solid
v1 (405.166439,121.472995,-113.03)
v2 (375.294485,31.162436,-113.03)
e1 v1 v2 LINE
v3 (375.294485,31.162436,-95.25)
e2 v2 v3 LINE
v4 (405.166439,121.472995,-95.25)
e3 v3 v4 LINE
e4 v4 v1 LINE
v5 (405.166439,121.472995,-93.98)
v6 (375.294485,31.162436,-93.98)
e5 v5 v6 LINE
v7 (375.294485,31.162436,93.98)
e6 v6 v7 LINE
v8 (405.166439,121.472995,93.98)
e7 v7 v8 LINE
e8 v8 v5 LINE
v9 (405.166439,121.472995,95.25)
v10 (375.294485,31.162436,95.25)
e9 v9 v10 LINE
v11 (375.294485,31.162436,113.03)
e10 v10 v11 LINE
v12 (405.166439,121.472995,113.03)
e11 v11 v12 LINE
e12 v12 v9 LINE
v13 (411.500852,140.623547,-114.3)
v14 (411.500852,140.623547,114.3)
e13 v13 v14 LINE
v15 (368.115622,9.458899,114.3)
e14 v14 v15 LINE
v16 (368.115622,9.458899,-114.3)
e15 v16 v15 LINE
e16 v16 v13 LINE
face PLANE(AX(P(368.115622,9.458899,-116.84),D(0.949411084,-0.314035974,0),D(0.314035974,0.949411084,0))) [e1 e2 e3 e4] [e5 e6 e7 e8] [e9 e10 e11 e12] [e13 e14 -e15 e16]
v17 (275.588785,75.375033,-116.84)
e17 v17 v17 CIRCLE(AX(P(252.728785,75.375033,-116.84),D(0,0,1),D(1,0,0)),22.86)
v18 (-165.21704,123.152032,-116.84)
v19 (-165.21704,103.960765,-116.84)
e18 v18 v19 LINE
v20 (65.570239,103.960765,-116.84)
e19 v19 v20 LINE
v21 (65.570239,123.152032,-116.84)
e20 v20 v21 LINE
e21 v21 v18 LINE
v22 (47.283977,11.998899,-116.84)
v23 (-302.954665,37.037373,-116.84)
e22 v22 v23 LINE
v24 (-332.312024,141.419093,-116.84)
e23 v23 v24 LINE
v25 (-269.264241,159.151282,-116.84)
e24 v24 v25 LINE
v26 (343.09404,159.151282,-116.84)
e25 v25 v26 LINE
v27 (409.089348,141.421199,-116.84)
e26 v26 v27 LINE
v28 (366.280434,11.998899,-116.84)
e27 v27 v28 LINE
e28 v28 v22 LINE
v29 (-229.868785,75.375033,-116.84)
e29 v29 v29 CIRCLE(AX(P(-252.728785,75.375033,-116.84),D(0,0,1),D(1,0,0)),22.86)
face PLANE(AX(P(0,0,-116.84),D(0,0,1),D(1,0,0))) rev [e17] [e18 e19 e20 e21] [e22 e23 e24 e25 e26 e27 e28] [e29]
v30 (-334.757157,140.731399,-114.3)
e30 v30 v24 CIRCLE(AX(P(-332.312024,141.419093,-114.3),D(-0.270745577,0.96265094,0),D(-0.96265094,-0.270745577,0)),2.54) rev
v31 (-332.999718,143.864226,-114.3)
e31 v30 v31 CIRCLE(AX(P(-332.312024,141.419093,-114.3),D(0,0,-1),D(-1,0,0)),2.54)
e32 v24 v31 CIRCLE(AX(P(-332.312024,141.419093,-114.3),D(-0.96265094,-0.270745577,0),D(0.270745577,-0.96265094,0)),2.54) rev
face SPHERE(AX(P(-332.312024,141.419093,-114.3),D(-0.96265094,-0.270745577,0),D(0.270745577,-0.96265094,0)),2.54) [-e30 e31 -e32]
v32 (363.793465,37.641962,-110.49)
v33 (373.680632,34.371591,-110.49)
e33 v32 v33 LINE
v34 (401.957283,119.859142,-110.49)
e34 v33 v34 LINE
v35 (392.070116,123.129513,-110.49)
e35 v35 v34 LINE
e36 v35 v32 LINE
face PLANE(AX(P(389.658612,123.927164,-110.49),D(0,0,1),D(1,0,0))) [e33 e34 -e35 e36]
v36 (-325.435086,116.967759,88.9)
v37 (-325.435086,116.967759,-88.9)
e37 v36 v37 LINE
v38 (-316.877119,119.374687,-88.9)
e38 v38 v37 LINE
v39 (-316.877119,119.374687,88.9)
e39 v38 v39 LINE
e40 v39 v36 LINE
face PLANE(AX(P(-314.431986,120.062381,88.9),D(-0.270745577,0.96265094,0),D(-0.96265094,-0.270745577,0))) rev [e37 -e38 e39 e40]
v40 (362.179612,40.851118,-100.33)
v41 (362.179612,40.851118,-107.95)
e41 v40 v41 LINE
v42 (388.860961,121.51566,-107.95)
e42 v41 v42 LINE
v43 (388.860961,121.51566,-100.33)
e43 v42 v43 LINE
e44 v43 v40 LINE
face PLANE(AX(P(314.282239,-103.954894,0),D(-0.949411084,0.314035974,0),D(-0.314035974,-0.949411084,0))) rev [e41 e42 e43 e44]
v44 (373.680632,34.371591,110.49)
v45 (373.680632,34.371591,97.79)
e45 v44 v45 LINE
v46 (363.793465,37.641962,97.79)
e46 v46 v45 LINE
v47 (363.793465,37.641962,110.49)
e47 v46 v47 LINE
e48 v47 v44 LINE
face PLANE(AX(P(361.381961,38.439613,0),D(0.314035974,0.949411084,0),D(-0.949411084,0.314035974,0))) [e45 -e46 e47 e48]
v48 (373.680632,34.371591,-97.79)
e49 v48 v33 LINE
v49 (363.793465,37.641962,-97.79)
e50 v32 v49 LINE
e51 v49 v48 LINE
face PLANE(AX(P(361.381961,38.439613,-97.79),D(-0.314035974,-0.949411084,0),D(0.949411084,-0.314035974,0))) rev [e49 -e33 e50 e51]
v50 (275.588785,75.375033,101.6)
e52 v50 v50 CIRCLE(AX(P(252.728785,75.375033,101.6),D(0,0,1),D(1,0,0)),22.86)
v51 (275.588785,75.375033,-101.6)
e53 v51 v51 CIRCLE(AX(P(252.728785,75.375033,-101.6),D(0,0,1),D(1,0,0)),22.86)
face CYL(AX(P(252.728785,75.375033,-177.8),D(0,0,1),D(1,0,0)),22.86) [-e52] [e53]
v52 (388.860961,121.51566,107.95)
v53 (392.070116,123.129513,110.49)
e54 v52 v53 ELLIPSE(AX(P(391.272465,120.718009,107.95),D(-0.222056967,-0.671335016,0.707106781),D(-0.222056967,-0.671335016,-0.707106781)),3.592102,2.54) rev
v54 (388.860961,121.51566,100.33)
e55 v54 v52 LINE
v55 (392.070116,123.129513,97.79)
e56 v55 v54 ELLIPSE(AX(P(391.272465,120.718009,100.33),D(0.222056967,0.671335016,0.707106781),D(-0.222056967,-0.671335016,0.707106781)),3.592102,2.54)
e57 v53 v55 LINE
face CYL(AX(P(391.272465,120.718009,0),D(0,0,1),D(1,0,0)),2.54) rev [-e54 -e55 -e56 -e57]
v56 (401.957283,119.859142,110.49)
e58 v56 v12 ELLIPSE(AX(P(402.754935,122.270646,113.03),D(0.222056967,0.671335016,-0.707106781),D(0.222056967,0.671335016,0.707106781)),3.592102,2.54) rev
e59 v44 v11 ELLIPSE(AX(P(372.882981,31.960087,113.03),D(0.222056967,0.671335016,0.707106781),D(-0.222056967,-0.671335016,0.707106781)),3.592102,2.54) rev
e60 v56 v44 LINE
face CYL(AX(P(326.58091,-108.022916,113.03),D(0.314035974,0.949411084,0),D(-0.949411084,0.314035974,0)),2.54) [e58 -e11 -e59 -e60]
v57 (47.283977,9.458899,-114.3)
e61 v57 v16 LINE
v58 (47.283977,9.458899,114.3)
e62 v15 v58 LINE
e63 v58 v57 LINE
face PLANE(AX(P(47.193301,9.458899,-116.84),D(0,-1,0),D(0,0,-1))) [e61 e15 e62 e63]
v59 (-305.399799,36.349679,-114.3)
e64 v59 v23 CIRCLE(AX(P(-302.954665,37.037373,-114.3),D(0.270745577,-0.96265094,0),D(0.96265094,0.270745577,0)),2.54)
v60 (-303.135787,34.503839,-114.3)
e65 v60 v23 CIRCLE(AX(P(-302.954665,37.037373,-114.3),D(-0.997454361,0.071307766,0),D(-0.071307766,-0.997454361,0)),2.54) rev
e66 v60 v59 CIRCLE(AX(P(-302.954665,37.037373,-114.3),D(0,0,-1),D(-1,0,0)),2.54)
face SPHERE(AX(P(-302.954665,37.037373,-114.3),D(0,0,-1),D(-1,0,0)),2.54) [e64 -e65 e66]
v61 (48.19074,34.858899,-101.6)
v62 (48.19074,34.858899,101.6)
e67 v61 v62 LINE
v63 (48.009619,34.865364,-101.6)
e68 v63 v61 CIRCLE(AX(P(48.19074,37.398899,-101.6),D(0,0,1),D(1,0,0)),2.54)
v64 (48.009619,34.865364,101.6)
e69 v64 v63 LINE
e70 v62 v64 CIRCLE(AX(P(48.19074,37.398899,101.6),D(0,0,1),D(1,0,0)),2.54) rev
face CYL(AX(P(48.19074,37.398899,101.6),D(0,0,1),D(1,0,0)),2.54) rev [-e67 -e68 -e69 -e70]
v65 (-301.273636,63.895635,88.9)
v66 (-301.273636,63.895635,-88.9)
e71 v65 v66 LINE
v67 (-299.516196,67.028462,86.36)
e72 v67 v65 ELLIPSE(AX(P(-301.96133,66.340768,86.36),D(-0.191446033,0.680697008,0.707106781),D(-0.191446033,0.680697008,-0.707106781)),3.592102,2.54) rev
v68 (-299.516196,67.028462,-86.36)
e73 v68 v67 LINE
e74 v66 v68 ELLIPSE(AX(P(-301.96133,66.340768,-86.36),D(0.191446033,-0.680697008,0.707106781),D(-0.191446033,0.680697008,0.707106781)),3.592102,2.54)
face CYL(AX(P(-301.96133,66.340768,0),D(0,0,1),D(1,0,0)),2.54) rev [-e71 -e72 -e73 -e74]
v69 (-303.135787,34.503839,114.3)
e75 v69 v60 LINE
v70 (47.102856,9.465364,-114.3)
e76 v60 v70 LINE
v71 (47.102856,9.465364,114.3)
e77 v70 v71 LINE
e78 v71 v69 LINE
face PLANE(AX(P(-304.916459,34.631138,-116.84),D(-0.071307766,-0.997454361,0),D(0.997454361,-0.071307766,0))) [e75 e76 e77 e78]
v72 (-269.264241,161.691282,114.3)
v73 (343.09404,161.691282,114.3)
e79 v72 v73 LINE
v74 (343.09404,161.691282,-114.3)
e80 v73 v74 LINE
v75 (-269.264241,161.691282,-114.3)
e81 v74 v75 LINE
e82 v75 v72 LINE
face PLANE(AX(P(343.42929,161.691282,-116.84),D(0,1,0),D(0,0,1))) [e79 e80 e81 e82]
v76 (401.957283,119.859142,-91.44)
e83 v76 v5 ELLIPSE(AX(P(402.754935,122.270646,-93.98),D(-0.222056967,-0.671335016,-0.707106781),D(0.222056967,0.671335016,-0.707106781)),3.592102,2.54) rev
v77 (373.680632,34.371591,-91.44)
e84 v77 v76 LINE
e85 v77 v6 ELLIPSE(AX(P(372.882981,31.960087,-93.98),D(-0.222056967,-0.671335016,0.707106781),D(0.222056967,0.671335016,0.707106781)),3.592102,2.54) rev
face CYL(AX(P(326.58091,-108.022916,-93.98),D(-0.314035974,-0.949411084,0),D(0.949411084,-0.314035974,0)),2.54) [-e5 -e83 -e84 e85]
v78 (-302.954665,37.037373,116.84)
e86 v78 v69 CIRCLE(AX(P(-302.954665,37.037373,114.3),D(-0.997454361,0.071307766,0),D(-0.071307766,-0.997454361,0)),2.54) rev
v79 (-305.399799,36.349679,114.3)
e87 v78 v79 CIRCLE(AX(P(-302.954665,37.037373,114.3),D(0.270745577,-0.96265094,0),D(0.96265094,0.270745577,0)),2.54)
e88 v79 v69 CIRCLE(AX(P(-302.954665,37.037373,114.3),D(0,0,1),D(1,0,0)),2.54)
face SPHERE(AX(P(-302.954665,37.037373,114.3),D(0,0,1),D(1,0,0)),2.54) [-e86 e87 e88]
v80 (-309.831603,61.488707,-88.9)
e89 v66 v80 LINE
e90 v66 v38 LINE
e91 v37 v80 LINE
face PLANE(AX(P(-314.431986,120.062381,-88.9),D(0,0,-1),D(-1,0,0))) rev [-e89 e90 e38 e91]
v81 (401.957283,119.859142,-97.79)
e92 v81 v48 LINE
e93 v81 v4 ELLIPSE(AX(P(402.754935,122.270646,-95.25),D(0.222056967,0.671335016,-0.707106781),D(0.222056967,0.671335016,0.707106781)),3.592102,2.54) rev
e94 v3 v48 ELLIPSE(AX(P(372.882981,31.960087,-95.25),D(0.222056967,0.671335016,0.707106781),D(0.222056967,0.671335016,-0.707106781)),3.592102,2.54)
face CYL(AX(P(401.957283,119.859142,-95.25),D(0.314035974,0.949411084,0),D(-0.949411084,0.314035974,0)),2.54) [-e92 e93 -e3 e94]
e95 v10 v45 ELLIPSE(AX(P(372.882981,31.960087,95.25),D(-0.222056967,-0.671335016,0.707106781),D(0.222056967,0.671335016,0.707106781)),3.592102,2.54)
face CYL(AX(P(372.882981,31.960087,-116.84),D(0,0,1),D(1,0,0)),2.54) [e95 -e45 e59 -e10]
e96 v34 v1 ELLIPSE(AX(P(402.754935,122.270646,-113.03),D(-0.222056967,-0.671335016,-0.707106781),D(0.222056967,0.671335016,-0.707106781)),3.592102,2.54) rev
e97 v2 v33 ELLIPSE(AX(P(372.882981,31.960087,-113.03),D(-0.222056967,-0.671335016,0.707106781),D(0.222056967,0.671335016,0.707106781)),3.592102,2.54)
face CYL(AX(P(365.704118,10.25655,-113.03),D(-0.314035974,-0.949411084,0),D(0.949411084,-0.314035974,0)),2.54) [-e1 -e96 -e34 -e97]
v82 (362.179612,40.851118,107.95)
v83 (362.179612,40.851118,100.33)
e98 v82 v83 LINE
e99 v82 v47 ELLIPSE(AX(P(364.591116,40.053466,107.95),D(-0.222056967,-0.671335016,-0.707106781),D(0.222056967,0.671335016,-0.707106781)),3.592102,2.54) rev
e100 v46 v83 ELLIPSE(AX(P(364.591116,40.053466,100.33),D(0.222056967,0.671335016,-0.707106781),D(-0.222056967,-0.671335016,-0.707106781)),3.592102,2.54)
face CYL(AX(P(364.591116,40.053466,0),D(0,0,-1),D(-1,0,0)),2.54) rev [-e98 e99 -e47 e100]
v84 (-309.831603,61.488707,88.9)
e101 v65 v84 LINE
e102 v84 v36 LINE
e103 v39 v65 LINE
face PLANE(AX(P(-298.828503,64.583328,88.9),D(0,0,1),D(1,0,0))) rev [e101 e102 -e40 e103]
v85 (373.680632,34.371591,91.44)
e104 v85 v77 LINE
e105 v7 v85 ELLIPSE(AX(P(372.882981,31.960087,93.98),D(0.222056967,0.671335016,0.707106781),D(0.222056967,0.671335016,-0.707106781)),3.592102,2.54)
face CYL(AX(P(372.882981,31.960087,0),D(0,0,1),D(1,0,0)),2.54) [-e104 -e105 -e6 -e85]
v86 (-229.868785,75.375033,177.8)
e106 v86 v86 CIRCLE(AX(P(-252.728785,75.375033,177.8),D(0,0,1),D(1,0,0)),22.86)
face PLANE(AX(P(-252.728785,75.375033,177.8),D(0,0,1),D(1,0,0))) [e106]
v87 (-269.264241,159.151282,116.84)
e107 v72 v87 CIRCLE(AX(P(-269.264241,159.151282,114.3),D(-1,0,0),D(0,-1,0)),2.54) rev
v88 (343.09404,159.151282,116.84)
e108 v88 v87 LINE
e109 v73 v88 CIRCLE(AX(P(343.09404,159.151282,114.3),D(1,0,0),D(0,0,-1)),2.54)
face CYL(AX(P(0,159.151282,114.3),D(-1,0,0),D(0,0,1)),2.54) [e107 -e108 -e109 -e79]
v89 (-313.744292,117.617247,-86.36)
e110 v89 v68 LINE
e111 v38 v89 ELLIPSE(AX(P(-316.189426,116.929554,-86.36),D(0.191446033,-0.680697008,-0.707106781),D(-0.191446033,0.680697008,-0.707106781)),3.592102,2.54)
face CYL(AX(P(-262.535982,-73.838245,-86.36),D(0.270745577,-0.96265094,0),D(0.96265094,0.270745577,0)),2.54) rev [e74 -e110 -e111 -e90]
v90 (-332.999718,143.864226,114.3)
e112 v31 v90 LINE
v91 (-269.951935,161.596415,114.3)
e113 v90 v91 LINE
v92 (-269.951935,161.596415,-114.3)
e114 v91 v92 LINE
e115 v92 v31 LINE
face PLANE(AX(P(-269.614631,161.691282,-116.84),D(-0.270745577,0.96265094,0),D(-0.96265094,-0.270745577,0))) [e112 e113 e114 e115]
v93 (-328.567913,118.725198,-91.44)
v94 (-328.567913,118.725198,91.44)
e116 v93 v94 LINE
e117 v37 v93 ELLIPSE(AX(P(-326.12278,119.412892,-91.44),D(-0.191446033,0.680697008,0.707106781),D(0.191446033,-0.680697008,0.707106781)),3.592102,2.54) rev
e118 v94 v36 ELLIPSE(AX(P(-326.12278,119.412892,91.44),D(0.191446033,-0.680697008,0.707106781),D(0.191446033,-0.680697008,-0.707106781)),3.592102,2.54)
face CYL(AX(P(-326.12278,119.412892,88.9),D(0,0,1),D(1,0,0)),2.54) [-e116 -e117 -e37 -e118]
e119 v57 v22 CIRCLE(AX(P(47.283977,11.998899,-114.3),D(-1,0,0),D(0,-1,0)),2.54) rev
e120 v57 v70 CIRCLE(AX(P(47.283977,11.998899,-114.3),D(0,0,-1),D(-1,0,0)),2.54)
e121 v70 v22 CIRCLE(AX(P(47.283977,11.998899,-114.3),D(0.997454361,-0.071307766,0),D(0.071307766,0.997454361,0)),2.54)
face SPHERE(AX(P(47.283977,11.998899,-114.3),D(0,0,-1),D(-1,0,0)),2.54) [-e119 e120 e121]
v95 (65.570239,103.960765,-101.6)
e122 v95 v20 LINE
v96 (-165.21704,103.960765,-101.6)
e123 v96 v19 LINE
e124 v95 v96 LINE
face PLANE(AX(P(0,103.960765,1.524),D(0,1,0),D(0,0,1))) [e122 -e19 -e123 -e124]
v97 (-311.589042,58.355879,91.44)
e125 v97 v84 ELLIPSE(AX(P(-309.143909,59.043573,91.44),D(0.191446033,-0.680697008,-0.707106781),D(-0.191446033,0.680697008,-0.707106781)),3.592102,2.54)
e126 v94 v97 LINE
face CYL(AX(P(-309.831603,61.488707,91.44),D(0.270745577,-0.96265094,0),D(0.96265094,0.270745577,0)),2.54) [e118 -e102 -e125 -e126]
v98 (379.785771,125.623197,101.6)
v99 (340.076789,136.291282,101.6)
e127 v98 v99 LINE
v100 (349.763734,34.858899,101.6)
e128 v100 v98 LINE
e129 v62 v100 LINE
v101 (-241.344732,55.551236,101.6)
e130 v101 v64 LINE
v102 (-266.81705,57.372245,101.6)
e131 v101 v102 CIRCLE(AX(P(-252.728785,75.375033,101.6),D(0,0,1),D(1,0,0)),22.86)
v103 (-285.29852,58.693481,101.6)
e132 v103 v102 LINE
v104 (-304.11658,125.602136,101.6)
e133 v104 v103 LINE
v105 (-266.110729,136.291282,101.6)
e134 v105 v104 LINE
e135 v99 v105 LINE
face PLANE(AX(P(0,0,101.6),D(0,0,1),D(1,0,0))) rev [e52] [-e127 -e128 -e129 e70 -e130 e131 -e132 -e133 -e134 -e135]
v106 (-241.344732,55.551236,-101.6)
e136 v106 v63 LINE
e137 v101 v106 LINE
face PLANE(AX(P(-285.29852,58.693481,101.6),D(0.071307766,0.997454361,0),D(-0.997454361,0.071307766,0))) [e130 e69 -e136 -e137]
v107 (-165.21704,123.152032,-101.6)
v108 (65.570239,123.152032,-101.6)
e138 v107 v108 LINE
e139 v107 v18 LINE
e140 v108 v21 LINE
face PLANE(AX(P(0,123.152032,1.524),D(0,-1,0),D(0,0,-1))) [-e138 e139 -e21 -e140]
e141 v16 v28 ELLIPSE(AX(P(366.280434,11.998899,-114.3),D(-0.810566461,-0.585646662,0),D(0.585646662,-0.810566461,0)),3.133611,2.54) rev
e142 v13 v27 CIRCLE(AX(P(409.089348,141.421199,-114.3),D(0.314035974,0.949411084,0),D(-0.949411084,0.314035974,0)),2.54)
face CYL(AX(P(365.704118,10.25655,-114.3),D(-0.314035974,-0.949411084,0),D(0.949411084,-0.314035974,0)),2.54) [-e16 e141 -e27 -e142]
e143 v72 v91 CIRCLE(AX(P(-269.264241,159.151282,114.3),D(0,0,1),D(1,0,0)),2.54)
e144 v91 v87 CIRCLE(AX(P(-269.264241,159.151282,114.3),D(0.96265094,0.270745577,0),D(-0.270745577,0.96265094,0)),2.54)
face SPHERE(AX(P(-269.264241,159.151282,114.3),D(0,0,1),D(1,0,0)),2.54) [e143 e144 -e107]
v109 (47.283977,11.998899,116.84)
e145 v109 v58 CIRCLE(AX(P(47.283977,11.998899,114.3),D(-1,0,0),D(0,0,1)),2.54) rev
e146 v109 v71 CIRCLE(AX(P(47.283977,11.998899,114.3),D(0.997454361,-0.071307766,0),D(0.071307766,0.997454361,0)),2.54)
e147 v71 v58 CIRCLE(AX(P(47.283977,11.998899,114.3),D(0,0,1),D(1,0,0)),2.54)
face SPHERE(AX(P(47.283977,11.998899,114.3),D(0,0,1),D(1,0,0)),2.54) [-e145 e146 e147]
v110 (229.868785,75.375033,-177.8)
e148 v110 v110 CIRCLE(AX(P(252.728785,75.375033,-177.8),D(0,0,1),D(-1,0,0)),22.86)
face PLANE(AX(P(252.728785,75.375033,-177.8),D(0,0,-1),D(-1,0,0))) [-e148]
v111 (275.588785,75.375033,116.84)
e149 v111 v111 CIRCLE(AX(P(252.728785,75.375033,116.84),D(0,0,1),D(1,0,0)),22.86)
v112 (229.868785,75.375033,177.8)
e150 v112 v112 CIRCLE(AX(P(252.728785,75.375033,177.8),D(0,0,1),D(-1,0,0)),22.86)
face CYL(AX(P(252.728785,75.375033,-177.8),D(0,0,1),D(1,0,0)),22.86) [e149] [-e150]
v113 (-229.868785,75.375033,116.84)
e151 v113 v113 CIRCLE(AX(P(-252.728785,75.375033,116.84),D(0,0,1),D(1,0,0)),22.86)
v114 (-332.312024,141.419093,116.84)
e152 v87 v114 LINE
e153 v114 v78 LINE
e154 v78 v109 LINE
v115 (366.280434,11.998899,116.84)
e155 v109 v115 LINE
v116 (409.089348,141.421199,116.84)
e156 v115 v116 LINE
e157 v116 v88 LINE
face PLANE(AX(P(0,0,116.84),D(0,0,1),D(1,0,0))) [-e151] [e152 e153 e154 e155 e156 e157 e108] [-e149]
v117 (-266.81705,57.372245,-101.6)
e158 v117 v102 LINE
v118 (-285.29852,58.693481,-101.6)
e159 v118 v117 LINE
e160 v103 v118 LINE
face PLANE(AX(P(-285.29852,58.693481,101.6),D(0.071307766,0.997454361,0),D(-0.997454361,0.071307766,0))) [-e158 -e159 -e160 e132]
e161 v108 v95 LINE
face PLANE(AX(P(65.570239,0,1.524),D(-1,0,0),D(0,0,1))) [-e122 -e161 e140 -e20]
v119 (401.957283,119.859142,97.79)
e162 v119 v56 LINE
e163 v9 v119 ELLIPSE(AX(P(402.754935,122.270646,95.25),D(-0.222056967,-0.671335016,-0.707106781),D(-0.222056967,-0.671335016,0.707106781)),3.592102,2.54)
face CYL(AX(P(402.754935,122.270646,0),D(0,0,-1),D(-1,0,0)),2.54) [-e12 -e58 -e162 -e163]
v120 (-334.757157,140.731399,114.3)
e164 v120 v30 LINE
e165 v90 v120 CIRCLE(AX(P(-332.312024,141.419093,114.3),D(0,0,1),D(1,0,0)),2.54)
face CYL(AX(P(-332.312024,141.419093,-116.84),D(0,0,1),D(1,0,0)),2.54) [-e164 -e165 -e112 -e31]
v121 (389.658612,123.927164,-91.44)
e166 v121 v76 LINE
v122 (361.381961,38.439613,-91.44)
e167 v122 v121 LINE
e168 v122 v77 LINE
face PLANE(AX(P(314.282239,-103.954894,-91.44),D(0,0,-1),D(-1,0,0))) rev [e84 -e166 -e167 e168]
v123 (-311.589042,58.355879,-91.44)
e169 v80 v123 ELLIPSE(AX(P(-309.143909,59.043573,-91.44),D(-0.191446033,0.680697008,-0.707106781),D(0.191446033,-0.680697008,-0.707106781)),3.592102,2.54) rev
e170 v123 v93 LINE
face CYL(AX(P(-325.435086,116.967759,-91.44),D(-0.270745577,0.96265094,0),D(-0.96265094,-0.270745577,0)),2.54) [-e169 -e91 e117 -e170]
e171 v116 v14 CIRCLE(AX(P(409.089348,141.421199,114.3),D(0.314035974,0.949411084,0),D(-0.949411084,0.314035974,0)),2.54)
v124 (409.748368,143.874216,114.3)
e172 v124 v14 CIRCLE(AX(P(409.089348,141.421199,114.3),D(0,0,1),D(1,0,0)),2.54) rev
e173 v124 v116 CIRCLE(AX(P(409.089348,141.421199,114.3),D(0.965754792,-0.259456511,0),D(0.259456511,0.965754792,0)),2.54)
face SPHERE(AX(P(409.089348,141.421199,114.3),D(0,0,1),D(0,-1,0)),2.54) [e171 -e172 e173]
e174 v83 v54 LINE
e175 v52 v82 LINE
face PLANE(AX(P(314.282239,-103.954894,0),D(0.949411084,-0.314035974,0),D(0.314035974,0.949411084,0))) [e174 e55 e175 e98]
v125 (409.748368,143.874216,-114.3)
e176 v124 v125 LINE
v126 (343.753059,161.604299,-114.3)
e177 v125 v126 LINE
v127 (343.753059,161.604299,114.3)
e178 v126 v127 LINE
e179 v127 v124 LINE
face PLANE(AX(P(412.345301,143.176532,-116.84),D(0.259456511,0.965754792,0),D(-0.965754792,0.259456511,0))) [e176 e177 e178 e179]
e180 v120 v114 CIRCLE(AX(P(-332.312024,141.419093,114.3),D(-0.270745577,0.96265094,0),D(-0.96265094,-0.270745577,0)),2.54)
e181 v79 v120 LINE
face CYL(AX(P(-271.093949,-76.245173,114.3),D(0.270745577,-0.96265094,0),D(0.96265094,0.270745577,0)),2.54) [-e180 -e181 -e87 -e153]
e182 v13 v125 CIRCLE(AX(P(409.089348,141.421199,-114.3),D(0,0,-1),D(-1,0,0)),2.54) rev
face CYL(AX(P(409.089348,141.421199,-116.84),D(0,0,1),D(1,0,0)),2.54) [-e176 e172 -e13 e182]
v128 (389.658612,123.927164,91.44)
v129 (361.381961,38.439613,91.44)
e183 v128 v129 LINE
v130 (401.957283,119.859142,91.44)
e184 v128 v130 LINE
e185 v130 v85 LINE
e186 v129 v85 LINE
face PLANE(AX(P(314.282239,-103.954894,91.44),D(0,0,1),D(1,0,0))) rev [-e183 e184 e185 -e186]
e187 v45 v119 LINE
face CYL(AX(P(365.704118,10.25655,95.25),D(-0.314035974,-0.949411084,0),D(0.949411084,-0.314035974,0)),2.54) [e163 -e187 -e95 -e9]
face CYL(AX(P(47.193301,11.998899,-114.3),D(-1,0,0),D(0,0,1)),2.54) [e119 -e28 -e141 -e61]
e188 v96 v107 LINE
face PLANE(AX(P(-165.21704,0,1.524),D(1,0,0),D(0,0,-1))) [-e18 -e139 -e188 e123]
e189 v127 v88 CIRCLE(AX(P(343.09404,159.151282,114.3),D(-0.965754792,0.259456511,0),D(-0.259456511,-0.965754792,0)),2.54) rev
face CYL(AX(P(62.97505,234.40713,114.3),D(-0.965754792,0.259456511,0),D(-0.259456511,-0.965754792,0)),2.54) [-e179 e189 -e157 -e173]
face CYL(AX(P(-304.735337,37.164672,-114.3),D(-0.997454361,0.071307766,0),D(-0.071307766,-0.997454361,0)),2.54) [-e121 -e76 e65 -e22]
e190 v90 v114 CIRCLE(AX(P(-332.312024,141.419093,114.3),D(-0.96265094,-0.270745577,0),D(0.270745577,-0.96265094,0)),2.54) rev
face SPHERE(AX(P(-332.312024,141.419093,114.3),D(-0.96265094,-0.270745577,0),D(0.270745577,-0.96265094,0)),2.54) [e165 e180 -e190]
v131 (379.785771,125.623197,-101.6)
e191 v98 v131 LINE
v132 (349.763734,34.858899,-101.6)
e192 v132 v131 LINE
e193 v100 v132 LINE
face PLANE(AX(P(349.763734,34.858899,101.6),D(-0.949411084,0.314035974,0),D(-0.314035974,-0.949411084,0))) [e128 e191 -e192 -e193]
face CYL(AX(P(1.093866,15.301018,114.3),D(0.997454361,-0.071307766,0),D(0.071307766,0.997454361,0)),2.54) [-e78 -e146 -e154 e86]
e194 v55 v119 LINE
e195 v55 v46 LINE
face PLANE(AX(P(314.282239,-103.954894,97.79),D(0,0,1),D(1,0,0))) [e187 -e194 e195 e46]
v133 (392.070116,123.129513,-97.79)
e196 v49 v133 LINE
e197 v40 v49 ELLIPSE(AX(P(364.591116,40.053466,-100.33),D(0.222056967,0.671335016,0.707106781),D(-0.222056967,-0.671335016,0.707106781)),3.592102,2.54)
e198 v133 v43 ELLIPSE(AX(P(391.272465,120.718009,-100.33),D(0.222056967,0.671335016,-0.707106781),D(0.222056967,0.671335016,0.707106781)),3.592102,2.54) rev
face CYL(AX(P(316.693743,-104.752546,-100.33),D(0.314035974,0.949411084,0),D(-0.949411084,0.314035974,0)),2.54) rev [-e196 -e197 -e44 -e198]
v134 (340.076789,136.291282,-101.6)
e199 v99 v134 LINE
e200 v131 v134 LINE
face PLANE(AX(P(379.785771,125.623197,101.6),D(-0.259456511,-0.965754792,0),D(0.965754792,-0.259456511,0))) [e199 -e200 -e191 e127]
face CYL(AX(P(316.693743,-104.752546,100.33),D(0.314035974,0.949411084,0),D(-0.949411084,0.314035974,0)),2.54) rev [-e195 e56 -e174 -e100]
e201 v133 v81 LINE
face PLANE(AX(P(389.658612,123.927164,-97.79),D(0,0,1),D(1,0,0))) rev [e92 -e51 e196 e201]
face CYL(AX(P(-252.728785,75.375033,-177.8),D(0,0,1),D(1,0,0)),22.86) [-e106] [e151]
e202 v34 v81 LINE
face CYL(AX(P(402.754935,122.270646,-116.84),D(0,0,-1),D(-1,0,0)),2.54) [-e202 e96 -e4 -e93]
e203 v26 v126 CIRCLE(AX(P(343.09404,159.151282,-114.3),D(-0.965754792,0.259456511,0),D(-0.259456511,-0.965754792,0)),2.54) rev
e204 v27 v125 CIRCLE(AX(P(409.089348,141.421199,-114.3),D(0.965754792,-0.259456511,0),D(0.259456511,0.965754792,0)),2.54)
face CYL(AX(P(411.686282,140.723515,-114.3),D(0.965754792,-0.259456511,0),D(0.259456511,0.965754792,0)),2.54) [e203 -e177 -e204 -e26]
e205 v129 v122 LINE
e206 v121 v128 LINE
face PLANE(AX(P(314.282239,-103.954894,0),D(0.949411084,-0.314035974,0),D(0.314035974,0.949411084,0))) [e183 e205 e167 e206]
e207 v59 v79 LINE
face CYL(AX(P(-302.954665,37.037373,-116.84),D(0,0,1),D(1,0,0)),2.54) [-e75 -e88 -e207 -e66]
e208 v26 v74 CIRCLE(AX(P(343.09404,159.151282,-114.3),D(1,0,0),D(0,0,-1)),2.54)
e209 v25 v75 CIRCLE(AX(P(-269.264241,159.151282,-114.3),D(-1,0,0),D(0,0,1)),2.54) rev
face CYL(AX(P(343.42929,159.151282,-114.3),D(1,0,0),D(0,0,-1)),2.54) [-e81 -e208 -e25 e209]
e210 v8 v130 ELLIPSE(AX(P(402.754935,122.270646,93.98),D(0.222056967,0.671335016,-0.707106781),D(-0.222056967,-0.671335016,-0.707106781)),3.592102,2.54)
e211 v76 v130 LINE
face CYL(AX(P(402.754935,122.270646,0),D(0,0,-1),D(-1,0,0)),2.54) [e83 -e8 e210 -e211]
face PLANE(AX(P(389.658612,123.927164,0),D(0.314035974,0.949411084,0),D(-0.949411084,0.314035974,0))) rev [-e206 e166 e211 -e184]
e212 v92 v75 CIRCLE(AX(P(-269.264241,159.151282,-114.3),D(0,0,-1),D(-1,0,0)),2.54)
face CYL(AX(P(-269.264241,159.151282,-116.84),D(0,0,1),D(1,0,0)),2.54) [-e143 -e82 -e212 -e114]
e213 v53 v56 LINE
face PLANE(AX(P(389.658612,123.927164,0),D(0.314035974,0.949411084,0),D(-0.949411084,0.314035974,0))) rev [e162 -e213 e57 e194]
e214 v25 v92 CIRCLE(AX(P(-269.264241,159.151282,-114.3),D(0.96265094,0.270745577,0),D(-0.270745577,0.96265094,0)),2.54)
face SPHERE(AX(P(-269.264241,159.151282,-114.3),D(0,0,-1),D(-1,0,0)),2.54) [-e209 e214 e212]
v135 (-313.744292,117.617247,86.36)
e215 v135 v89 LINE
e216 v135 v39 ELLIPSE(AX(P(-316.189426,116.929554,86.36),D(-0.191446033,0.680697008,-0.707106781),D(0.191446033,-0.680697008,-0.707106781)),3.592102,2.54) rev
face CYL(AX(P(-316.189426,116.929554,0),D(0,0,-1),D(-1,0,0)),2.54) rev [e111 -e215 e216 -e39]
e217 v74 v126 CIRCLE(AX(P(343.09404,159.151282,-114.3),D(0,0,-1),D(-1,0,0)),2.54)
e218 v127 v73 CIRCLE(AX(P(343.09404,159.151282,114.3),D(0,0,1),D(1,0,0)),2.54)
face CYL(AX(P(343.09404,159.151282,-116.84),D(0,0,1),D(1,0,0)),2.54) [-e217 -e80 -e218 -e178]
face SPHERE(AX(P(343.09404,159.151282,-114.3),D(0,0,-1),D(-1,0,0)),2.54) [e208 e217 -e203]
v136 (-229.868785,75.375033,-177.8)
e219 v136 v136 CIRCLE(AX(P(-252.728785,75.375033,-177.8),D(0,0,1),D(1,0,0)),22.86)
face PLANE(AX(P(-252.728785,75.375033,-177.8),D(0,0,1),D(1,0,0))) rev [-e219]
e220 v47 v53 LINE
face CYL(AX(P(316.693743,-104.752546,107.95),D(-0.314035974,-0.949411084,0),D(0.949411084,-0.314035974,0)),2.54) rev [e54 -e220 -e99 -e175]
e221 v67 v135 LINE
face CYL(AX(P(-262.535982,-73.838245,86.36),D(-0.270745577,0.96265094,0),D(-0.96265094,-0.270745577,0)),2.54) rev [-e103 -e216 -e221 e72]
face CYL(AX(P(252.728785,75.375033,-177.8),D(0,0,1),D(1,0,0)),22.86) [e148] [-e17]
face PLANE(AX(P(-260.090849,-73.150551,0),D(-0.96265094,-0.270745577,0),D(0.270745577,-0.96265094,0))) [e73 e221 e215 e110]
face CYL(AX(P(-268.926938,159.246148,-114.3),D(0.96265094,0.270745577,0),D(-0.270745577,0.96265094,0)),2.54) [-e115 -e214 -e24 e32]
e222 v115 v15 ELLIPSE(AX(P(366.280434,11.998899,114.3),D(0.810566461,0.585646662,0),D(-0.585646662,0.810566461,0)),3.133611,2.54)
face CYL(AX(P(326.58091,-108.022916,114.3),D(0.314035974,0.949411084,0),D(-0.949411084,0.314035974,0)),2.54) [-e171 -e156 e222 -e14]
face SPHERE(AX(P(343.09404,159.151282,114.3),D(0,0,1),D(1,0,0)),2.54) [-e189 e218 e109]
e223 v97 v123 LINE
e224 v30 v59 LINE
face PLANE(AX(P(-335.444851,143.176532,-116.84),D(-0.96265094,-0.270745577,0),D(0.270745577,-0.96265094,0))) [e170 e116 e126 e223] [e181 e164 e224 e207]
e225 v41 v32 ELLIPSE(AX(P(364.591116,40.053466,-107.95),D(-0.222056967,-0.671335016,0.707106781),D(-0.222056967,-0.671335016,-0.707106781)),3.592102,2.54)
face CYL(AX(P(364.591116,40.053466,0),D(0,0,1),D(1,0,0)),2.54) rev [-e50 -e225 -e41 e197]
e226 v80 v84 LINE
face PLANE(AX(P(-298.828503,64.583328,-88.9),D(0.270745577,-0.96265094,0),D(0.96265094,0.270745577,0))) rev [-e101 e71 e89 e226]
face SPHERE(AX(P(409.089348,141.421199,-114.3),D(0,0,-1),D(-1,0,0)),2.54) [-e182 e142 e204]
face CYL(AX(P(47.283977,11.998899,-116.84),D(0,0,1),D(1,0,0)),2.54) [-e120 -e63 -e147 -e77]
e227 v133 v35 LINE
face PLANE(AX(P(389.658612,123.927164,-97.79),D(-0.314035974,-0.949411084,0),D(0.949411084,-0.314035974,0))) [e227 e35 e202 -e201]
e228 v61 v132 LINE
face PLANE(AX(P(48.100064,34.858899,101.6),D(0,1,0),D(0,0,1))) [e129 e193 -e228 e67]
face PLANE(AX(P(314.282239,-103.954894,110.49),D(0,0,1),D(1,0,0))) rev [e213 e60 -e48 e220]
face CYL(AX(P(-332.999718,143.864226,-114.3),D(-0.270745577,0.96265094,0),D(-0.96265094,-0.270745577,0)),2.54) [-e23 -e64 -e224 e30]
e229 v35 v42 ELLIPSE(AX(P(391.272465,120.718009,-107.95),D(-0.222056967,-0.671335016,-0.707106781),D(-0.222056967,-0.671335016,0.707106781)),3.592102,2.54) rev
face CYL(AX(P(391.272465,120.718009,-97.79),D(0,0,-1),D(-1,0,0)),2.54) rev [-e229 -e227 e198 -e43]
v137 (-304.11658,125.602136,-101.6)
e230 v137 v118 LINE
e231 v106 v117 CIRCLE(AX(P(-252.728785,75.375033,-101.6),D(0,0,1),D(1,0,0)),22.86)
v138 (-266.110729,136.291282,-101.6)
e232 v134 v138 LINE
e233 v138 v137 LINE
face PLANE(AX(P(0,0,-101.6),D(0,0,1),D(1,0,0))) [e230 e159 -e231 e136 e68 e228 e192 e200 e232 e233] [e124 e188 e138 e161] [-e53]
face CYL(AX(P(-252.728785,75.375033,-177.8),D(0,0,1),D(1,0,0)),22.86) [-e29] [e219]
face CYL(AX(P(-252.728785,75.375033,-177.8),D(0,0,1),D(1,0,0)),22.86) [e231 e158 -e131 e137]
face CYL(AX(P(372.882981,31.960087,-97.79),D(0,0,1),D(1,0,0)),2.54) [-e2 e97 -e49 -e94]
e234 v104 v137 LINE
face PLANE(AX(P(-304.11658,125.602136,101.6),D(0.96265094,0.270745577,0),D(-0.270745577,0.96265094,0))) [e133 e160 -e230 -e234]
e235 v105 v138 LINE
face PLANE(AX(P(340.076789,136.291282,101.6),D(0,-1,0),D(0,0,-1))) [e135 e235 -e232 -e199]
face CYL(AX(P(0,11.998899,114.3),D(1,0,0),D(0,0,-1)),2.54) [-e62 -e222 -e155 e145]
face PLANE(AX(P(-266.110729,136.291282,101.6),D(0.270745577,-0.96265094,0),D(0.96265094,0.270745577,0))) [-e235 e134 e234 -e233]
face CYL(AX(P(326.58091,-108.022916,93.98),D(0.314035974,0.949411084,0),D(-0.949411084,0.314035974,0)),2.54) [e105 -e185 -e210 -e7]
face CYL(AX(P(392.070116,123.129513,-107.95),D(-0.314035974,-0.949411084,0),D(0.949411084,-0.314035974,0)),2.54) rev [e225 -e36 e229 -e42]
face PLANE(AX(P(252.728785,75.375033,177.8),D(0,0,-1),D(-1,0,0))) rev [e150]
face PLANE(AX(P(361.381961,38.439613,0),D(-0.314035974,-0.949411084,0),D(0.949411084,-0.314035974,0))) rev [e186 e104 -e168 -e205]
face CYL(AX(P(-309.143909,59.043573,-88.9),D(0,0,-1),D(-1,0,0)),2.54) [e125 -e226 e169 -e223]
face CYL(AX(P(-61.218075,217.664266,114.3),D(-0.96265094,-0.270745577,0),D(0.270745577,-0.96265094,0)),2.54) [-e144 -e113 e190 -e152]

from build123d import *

# Parameters (mm, degrees)
BOSS_EXTRUDE1_DEPTH      = 116.84
BOSS_EXTRUDE1_DEPTH_BACK = 116.84
SKETCH4_W                = 182.88
SKETCH4_H                = 90.042714046
SKETCH4_W_2              = 12.7
CUT_EXTRUDE1_DEPTH       = 15.494
FILLET1_R                = 2.54
FILLET2_R                = 2.54
CUT_EXTRUDE2_DEPTH       = 101.6
CUT_EXTRUDE2_DEPTH_BACK  = 101.6
FILLET3_R                = 2.54
SKETCH6_W                = 177.8
SKETCH6_H                = 57.631536049
CUT_EXTRUDE3_DEPTH       = 13.97
FILLET4_R                = 2.54
BOSS_EXTRUDE3_DEPTH      = 177.8
BOSS_EXTRUDE3_DEPTH_BACK = 177.8
SKETCH8_R                = 22.86
CUT_EXTRUDE4_DEPTH       = 118.364


with BuildPart() as part:
    # Sketch3 → Boss-Extrude1 (new, two sides: drawn at the far end of the back side and taken through both)
    with BuildSketch(Plane.XY.offset(-BOSS_EXTRUDE1_DEPTH_BACK)):
        Polygon((412.345301331, 143.176532362), (343.429290034, 161.691281666), (-269.614631353, 161.691281666), (-335.444851099, 143.176532362), (-304.916459035, 34.631138356), (47.193301176, 9.458898503), (368.115622439, 9.458898503), align=None)
    extrude(amount=BOSS_EXTRUDE1_DEPTH + BOSS_EXTRUDE1_DEPTH_BACK)

    # Sketch4 → Cut-Extrude1 (cut)
    with BuildSketch(Plane(origin=(328.992414347, -108.820567822, 0), x_dir=(0, 0, -1), z_dir=(0.9494110843087806, -0.3140359740405954, 0))):
        with Locations((0, 195.003288159)):
            Rectangle(SKETCH4_W, SKETCH4_H)
        with Locations((-104.14, 195.003288159)):
            Rectangle(SKETCH4_W_2, SKETCH4_H)
        with Locations((104.14, 195.003288159)):
            Rectangle(SKETCH4_W_2, SKETCH4_H)
    extrude(amount=-CUT_EXTRUDE1_DEPTH, mode=Mode.SUBTRACT)

    # Fillet1
    fillet1_edges = [part.edges().sort_by_distance(p)[0] for p in [
        (404.36878759, 119.061490821, -104.14),
        (390.230461885, 76.317715433, -110.49),
        (361.381960839, 38.439613426, -104.14),
        (375.520286544, 81.183388814, -97.79),
        (389.65861225, 123.927164203, -104.14),
        (375.520286544, 81.183388814, -110.49),
        (390.230461885, 76.317715433, -97.79),
        (376.092136179, 33.573940044, -104.14),
        (390.230461885, 76.317715433, 97.79),
        (376.092136179, 33.573940044, 104.14),
        (375.520286544, 81.183388814, 110.49),
        (389.65861225, 123.927164203, 104.14),
        (375.520286544, 81.183388814, 97.79),
        (361.381960839, 38.439613426, 104.14),
        (404.36878759, 119.061490821, 104.14),
        (390.230461885, 76.317715433, 110.49),
    ]]
    fillet(fillet1_edges, radius=FILLET1_R)

    # Fillet2
    fillet2_edges = [part.edges().sort_by_distance(p)[0] for p in [
        (390.230461885, 76.317715433, -91.44),
        (404.36878759, 119.061490821, 0),
        (390.230461885, 76.317715433, 91.44),
        (376.092136179, 33.573940044, 0),
    ]]
    fillet(fillet2_edges, radius=FILLET2_R)

    # Sketch5 → Cut-Extrude2 (cut, two sides: drawn at the far end of the back side and taken through both)
    with BuildSketch(Plane.XY.offset(-CUT_EXTRUDE2_DEPTH_BACK)):
        Polygon((379.785771188, 125.623196843), (340.076788789, 136.291281666), (-266.110728793, 136.291281666), (-304.116579565, 125.602136136), (-285.29852031, 58.693481005), (48.100063951, 34.858898503), (349.763734045, 34.858898503), align=None)
    extrude(amount=CUT_EXTRUDE2_DEPTH + CUT_EXTRUDE2_DEPTH_BACK, mode=Mode.SUBTRACT)

    # Fillet3
    # the kernel refuses this fillet: 2.54 mm, written as the material it adds along each edge
    with BuildSketch(Plane(origin=(48.100063951, 34.858898503, 101.826690694), x_dir=(1, 0, 0), z_dir=(0, 0, -1))) as fillet3_piece_1:
        with BuildLine():
            CenterArc((FILLET3_R * 0.0356993218371, -FILLET3_R), FILLET3_R, 90, 4.089104427)
            Line((-FILLET3_R * 0.0356084442551, -FILLET3_R * 0.00254563889121), (0, 0))
            Line((0, 0), (FILLET3_R * 0.0356993218371, 0))
        make_face()
    extrude(amount=203.653381387)
    # the kernel refuses this fillet: 2.54 mm, written as the material it takes off along each edge
    with BuildSketch(Plane(origin=(47.283977453, 11.998898503, 114.3), x_dir=(-0.07130776609221037, -0.9974543611087873, 0), z_dir=(0, 0, 1))) as fillet3_2_piece_1_section:
        Polygon((0, 0), (FILLET3_R * 1.02, 0), (FILLET3_R * 1.02, FILLET3_R * 0.0364133082739), (FILLET3_R * 1.01740344833, FILLET3_R * 0.0727339214141), align=None)
    fillet3_2_piece_1 = extrude(amount=FILLET3_R * 1.02, mode=Mode.PRIVATE)
    fillet3_2_piece_1 = fillet3_2_piece_1 - Plane(origin=(47.283977453, 11.998898503, 114.3), x_dir=(0.035676595207593184, 0.9993633876395481, 0), z_dir=(0, 0, 1)) * Sphere(FILLET3_R, mode=Mode.PRIVATE)
    add(fillet3_2_piece_1, mode=Mode.SUBTRACT)
    with BuildSketch(Plane(origin=(47.283977453, 11.998898503, -114.3), x_dir=(-0.07130776609221037, -0.9974543611087873, 0), z_dir=(0, 0, -1))) as fillet3_2_piece_2_section:
        Polygon((0, 0), (FILLET3_R * 1.02, 0), (FILLET3_R * 1.02, -FILLET3_R * 0.0364133082739), (FILLET3_R * 1.01740344833, -FILLET3_R * 0.0727339214141), align=None)
    fillet3_2_piece_2 = extrude(amount=FILLET3_R * 1.02, mode=Mode.PRIVATE)
    fillet3_2_piece_2 = fillet3_2_piece_2 - Plane(origin=(47.283977453, 11.998898503, -114.3), x_dir=(0.035676595207593184, 0.9993633876395481, 0), z_dir=(0, 0, -1)) * Sphere(FILLET3_R, mode=Mode.PRIVATE)
    add(fillet3_2_piece_2, mode=Mode.SUBTRACT)
    with BuildSketch(Plane(origin=(-302.954665162, 37.03737262, -114.3), x_dir=(-0.9626509401538987, -0.27074557691828516, 0), z_dir=(0, 0, -1))) as fillet3_2_piece_3_section:
        Polygon((0, 0), (FILLET3_R * 1.02, 0), (FILLET3_R * 1.02, -FILLET3_R * 0.716898030256), (FILLET3_R * 0.345474861407, -FILLET3_R * 0.959711998537), align=None)
    fillet3_2_piece_3 = extrude(amount=FILLET3_R * 1.02, mode=Mode.PRIVATE)
    fillet3_2_piece_3 = fillet3_2_piece_3 - Plane(origin=(-302.954665162, 37.03737262, -114.3), x_dir=(0.6318971956026084, 0.7750522138472729, 0), z_dir=(0, 0, -1)) * Sphere(FILLET3_R, mode=Mode.PRIVATE)
    add(fillet3_2_piece_3, mode=Mode.SUBTRACT)
    with BuildSketch(Plane(origin=(-302.954665162, 37.03737262, 114.3), x_dir=(-0.9626509401538987, -0.27074557691828516, 0), z_dir=(0, 0, 1))) as fillet3_2_piece_4_section:
        Polygon((0, 0), (FILLET3_R * 1.02, 0), (FILLET3_R * 1.02, FILLET3_R * 0.716898030256), (FILLET3_R * 0.345474861407, FILLET3_R * 0.959711998537), align=None)
    fillet3_2_piece_4 = extrude(amount=FILLET3_R * 1.02, mode=Mode.PRIVATE)
    fillet3_2_piece_4 = fillet3_2_piece_4 - Plane(origin=(-302.954665162, 37.03737262, 114.3), x_dir=(0.6318971956026084, 0.7750522138472729, 0), z_dir=(0, 0, 1)) * Sphere(FILLET3_R, mode=Mode.PRIVATE)
    add(fillet3_2_piece_4, mode=Mode.SUBTRACT)
    with BuildSketch(Plane(origin=(343.094039909, 159.151281666, -114.3), x_dir=(0.25945651134605857, 0.9657547922325483, 0), z_dir=(0, 0, -1))) as fillet3_2_piece_5_section:
        Polygon((0, 0), (FILLET3_R * 1.02, 0), (FILLET3_R * 1.02, -FILLET3_R * 0.134628002749), (FILLET3_R * 0.985069888077, -FILLET3_R * 0.264645641573), align=None)
    fillet3_2_piece_5 = extrude(amount=FILLET3_R * 1.02, mode=Mode.PRIVATE)
    fillet3_2_piece_5 = fillet3_2_piece_5 - Plane(origin=(343.094039909, 159.151281666, -114.3), x_dir=(-0.13085336787307325, -0.9914017329600923, 0), z_dir=(0, 0, -1)) * Sphere(FILLET3_R, mode=Mode.PRIVATE)
    add(fillet3_2_piece_5, mode=Mode.SUBTRACT)
    with BuildSketch(Plane(origin=(-269.264241097, 159.151281666, -114.3), x_dir=(-0.270745576918285, 0.9626509401538987, 0), z_dir=(0, 0, -1))) as fillet3_2_piece_6_section:
        Polygon((0, 0), (FILLET3_R * 1.02, 0), (FILLET3_R * 1.02, FILLET3_R * 0.140707898081), (FILLET3_R * 0.981903958957, FILLET3_R * 0.276160488457), align=None)
    fillet3_2_piece_6 = extrude(amount=FILLET3_R * 1.02, mode=Mode.PRIVATE)
    fillet3_2_piece_6 = fillet3_2_piece_6 - Plane(origin=(-269.264241097, 159.151281666, -114.3), x_dir=(0.13665478375472503, -0.9906187309338288, 0), z_dir=(0, 0, -1)) * Sphere(FILLET3_R, mode=Mode.PRIVATE)
    add(fillet3_2_piece_6, mode=Mode.SUBTRACT)
    with BuildSketch(Plane(origin=(-332.312023946, 141.41909274, -114.3), x_dir=(-0.270745576918285, 0.9626509401538987, 0), z_dir=(0, 0, -1))) as fillet3_2_piece_7_section:
        Polygon((0, 0), (FILLET3_R * 1.02, 0), (FILLET3_R * 1.02, -FILLET3_R * 1.02), (0, -FILLET3_R * 1.02), align=None)
    fillet3_2_piece_7 = extrude(amount=FILLET3_R * 1.02, mode=Mode.PRIVATE)
    fillet3_2_piece_7 = fillet3_2_piece_7 - Plane(origin=(-332.312023946, 141.41909274, -114.3), x_dir=(0.8721430411136103, -0.48925097428324366, 0), z_dir=(0, 0, -1)) * Sphere(FILLET3_R, mode=Mode.PRIVATE)
    add(fillet3_2_piece_7, mode=Mode.SUBTRACT)
    with BuildSketch(Plane(origin=(-332.312023946, 141.41909274, 114.3), x_dir=(-0.270745576918285, 0.9626509401538987, 0), z_dir=(0, 0, 1))) as fillet3_2_piece_8_section:
        Polygon((0, 0), (FILLET3_R * 1.02, 0), (FILLET3_R * 1.02, FILLET3_R * 1.02), (0, FILLET3_R * 1.02), align=None)
    fillet3_2_piece_8 = extrude(amount=FILLET3_R * 1.02, mode=Mode.PRIVATE)
    fillet3_2_piece_8 = fillet3_2_piece_8 - Plane(origin=(-332.312023946, 141.41909274, 114.3), x_dir=(0.8721430411136103, -0.48925097428324366, 0), z_dir=(0, 0, 1)) * Sphere(FILLET3_R, mode=Mode.PRIVATE)
    add(fillet3_2_piece_8, mode=Mode.SUBTRACT)
    with BuildSketch(Plane(origin=(-269.264241097, 159.151281666, 114.3), x_dir=(0, 1, 0), z_dir=(0, 0, 1))) as fillet3_2_piece_9_section:
        Polygon((0, 0), (FILLET3_R * 1.02, 0), (FILLET3_R * 1.02, FILLET3_R * 0.140707898081), (FILLET3_R * 0.981903958957, FILLET3_R * 0.276160488457), align=None)
    fillet3_2_piece_9 = extrude(amount=FILLET3_R * 1.02, mode=Mode.PRIVATE)
    fillet3_2_piece_9 = fillet3_2_piece_9 - Plane(origin=(-269.264241097, 159.151281666, 114.3), x_dir=(0.13665478375472503, -0.9906187309338288, 0), z_dir=(0, 0, 1)) * Sphere(FILLET3_R, mode=Mode.PRIVATE)
    add(fillet3_2_piece_9, mode=Mode.SUBTRACT)
    with BuildSketch(Plane(origin=(343.094039909, 159.151281666, 114.3), x_dir=(0.25945651134605857, 0.9657547922325483, 0), z_dir=(0, 0, 1))) as fillet3_2_piece_10_section:
        Polygon((0, 0), (FILLET3_R * 1.02, 0), (FILLET3_R * 1.02, FILLET3_R * 0.134628002749), (FILLET3_R * 0.985069888077, FILLET3_R * 0.264645641573), align=None)
    fillet3_2_piece_10 = extrude(amount=FILLET3_R * 1.02, mode=Mode.PRIVATE)
    fillet3_2_piece_10 = fillet3_2_piece_10 - Plane(origin=(343.094039909, 159.151281666, 114.3), x_dir=(-0.13085336787307325, -0.9914017329600923, 0), z_dir=(0, 0, 1)) * Sphere(FILLET3_R, mode=Mode.PRIVATE)
    add(fillet3_2_piece_10, mode=Mode.SUBTRACT)
    with BuildSketch(Plane(origin=(409.089348316, 141.42119881, 114.3), x_dir=(0.25945651134605857, 0.9657547922325483, 0), z_dir=(0, 0, 1))) as fillet3_2_piece_11_section:
        Polygon((0, 0), (FILLET3_R * 1.02, 0), (FILLET3_R * 1.02, -FILLET3_R * 1.07984247927), (-FILLET3_R * 0.058089876277, -FILLET3_R * 1.01834452239), align=None)
    fillet3_2_piece_11 = extrude(amount=FILLET3_R * 1.02, mode=Mode.PRIVATE)
    fillet3_2_piece_11 = fillet3_2_piece_11 - Plane(origin=(409.089348316, 141.42119881, 114.3), x_dir=(-0.8802308318365007, -0.47454576458379855, 0), z_dir=(0, 0, 1)) * Sphere(FILLET3_R, mode=Mode.PRIVATE)
    add(fillet3_2_piece_11, mode=Mode.SUBTRACT)
    with BuildSketch(Plane(origin=(409.089348316, 141.42119881, -114.3), x_dir=(0.25945651134605857, 0.9657547922325483, 0), z_dir=(0, 0, -1))) as fillet3_2_piece_12_section:
        Polygon((0, 0), (FILLET3_R * 1.02, 0), (FILLET3_R * 1.02, FILLET3_R * 1.07984247927), (-FILLET3_R * 0.058089876277, FILLET3_R * 1.01834452239), align=None)
    fillet3_2_piece_12 = extrude(amount=FILLET3_R * 1.02, mode=Mode.PRIVATE)
    fillet3_2_piece_12 = fillet3_2_piece_12 - Plane(origin=(409.089348316, 141.42119881, -114.3), x_dir=(-0.8802308318365007, -0.47454576458379855, 0), z_dir=(0, 0, -1)) * Sphere(FILLET3_R, mode=Mode.PRIVATE)
    add(fillet3_2_piece_12, mode=Mode.SUBTRACT)
    with BuildSketch(Plane(origin=(47.193301176, 9.458898503, 114.3), x_dir=(1, 0, 0), z_dir=(0, 0, -1))) as fillet3_2_piece_13:
        with BuildLine():
            CenterArc((FILLET3_R * 0.0356993218371, -FILLET3_R), FILLET3_R, 90, 4.089104427)
            Line((-FILLET3_R * 0.0356084442551, -FILLET3_R * 0.00254563889121), (0, 0))
            Line((0, 0), (FILLET3_R * 0.0356993218371, 0))
        make_face()
    extrude(amount=228.6, mode=Mode.SUBTRACT)
    with BuildSketch(Plane(origin=(-304.916459035, 34.631138356, -114.3), x_dir=(0.9974543611087872, -0.07130776609221003, 0), z_dir=(0, 0, 1))) as fillet3_2_piece_14:
        with BuildLine():
            CenterArc((FILLET3_R * 0.702841206134, FILLET3_R), FILLET3_R, 199.797742256, 70.202257744)
            Line((-FILLET3_R * 0.238052910079, FILLET3_R * 0.661299155483), (0, 0))
            Line((0, 0), (FILLET3_R * 0.702841206134, 0))
        make_face()
    extrude(amount=228.6, mode=Mode.SUBTRACT)
    with BuildSketch(Plane(origin=(343.094039909, 161.691281666, -116.84), x_dir=(0, -1, 0), z_dir=(-1, 0, 0))) as fillet3_2_piece_15:
        with BuildLine():
            CenterArc((FILLET3_R, FILLET3_R), FILLET3_R, 180, 90)
            Line((0, FILLET3_R), (0, 0))
            Line((0, 0), (FILLET3_R, 0))
        make_face()
    extrude(amount=612.358281006, mode=Mode.SUBTRACT)
    with BuildSketch(Plane(origin=(-335.444851099, 143.176532362, -114.3), x_dir=(0.9626509401538971, 0.27074557691829054, 0), z_dir=(0, 0, 1))) as fillet3_2_piece_16:
        with BuildLine():
            CenterArc((FILLET3_R, -FILLET3_R), FILLET3_R, 90, 90)
            Line((0, -FILLET3_R), (0, 0))
            Line((0, 0), (FILLET3_R, 0))
        make_face()
    extrude(amount=228.6, mode=Mode.SUBTRACT)
    with BuildSketch(Plane(origin=(-269.614631353, 161.691281666, -114.3), x_dir=(1, 0, 0), z_dir=(0, 0, 1))) as fillet3_2_piece_17:
        with BuildLine():
            CenterArc((FILLET3_R * 0.137948919688, -FILLET3_R), FILLET3_R, 90, 15.708637829)
            Line((-FILLET3_R * 0.132796657231, -FILLET3_R * 0.0373490598461), (0, 0))
            Line((0, 0), (FILLET3_R * 0.137948919688, 0))
        make_face()
    extrude(amount=228.6, mode=Mode.SUBTRACT)
    with BuildSketch(Plane(origin=(343.429290034, 161.691281666, -114.3), x_dir=(0.9657547922325409, -0.2594565113460861, 0), z_dir=(0, 0, 1))) as fillet3_2_piece_18:
        with BuildLine():
            CenterArc((FILLET3_R * 0.131988237989, -FILLET3_R), FILLET3_R, 90, 15.037815904)
            Line((-FILLET3_R * 0.127468273357, -FILLET3_R * 0.0342452077675), (0, 0))
            Line((0, 0), (FILLET3_R * 0.131988237989, 0))
        make_face()
    extrude(amount=228.6, mode=Mode.SUBTRACT)
    with BuildSketch(Plane(origin=(412.345301331, 143.176532362, 114.3), x_dir=(-0.3140359740405999, -0.9494110843087791, 0), z_dir=(0, 0, -1))) as fillet3_2_piece_19:
        with BuildLine():
            CenterArc((FILLET3_R * 1.05866909732, FILLET3_R), FILLET3_R, 176.735189662, 93.264810338)
            Line((FILLET3_R * 0.0602921145899, FILLET3_R * 1.0569508591), (0, 0))
            Line((0, 0), (FILLET3_R * 1.05866909732, 0))
        make_face()
    extrude(amount=228.6, mode=Mode.SUBTRACT)
    with BuildSketch(Plane(origin=(-269.951934862, 161.596415054, -116.84), x_dir=(0.270745576918285, -0.9626509401538987, 5.594824691024432e-15), z_dir=(-0.9626509401538987, -0.270745576918285, 0))) as fillet3_2_piece_20:
        with BuildLine():
            CenterArc((FILLET3_R, FILLET3_R), FILLET3_R, 180, 90)
            Line((0, FILLET3_R), (0, 0))
            Line((0, 0), (FILLET3_R, 0))
        make_face()
    extrude(amount=65.493919155, mode=Mode.SUBTRACT)
    with BuildSketch(Plane(origin=(-334.757157334, 140.731398974, -116.84), x_dir=(0.9626509401538985, 0.27074557691828516, 5.594824691024432e-15), z_dir=(0.2707455769182851, -0.9626509401538986, 0))) as fillet3_2_piece_21:
        with BuildLine():
            CenterArc((FILLET3_R, FILLET3_R), FILLET3_R, 180, 90)
            Line((0, FILLET3_R), (0, 0))
            Line((0, 0), (FILLET3_R, 0))
        make_face()
    extrude(amount=108.431536048, mode=Mode.SUBTRACT)
    with BuildSketch(Plane(origin=(366.121494004, 3.430138118, 116.84), x_dir=(0, 0, -1), z_dir=(0.3140359740405954, 0.9494110843087806, 0))) as fillet3_2_piece_22:
        with BuildLine():
            CenterArc((FILLET3_R, FILLET3_R), FILLET3_R, 180, 90)
            Line((0, FILLET3_R), (0, 0))
            Line((0, 0), (FILLET3_R, 0))
        make_face()
    extrude(amount=144.503694539, mode=Mode.SUBTRACT)
    with BuildSketch(Plane(origin=(409.748367855, 143.874215983, 116.84), x_dir=(-0.25945651134605857, -0.9657547922325482, -5.594824691024398e-15), z_dir=(-0.9657547922325483, 0.25945651134605857, 0))) as fillet3_2_piece_23:
        with BuildLine():
            CenterArc((FILLET3_R, -FILLET3_R), FILLET3_R, 90, 90)
            Line((0, -FILLET3_R), (0, 0))
            Line((0, 0), (FILLET3_R, 0))
        make_face()
    extrude(amount=68.335470803, mode=Mode.SUBTRACT)
    with BuildSketch(Plane(origin=(343.094039909, 161.691281666, 116.84), x_dir=(0, -1, 0), z_dir=(-1, 0, 0))) as fillet3_2_piece_24:
        with BuildLine():
            CenterArc((FILLET3_R, -FILLET3_R), FILLET3_R, 90, 90)
            Line((0, -FILLET3_R), (0, 0))
            Line((0, 0), (FILLET3_R, 0))
        make_face()
    extrude(amount=612.358281006, mode=Mode.SUBTRACT)
    with BuildSketch(Plane(origin=(-269.951934862, 161.596415054, 116.84), x_dir=(0.270745576918285, -0.9626509401538987, -5.594824691024432e-15), z_dir=(-0.9626509401538987, -0.270745576918285, 0))) as fillet3_2_piece_25:
        with BuildLine():
            CenterArc((FILLET3_R, -FILLET3_R), FILLET3_R, 90, 90)
            Line((0, -FILLET3_R), (0, 0))
            Line((0, 0), (FILLET3_R, 0))
        make_face()
    extrude(amount=65.493919155, mode=Mode.SUBTRACT)
    with BuildSketch(Plane(origin=(-334.757157334, 140.731398974, 116.84), x_dir=(0.9626509401538985, 0.27074557691828516, -5.594824691024432e-15), z_dir=(0.2707455769182851, -0.9626509401538986, 0))) as fillet3_2_piece_26:
        with BuildLine():
            CenterArc((FILLET3_R, -FILLET3_R), FILLET3_R, 90, 90)
            Line((0, -FILLET3_R), (0, 0))
            Line((0, 0), (FILLET3_R, 0))
        make_face()
    extrude(amount=108.431536048, mode=Mode.SUBTRACT)
    with BuildSketch(Plane(origin=(-303.135786888, 34.503838543, 116.84), x_dir=(0.07130776609221036, 0.997454361108787, -5.594824691024416e-15), z_dir=(0.997454361108787, -0.07130776609221036, 0))) as fillet3_2_piece_27:
        with BuildLine():
            CenterArc((FILLET3_R, -FILLET3_R), FILLET3_R, 90, 90)
            Line((0, -FILLET3_R), (0, 0))
            Line((0, 0), (FILLET3_R, 0))
        make_face()
    extrude(amount=351.132499161, mode=Mode.SUBTRACT)
    with BuildSketch(Plane(origin=(47.283977453, 9.458898503, 116.84), x_dir=(0, 0, -1), z_dir=(1, 0, 0))) as fillet3_2_piece_28:
        with BuildLine():
            CenterArc((FILLET3_R, FILLET3_R), FILLET3_R, 180, 90)
            Line((0, FILLET3_R), (0, 0))
            Line((0, 0), (FILLET3_R, 0))
        make_face()
    extrude(amount=327.181644985, mode=Mode.SUBTRACT)
    with BuildSketch(Plane(origin=(-303.135786888, 34.503838543, -116.84), x_dir=(0.07130776609221036, 0.997454361108787, 5.594824691024416e-15), z_dir=(0.997454361108787, -0.07130776609221036, 0))) as fillet3_2_piece_29:
        with BuildLine():
            CenterArc((FILLET3_R, FILLET3_R), FILLET3_R, 180, 90)
            Line((0, FILLET3_R), (0, 0))
            Line((0, 0), (FILLET3_R, 0))
        make_face()
    extrude(amount=351.132499161, mode=Mode.SUBTRACT)
    with BuildSketch(Plane(origin=(47.283977453, 9.458898503, -116.84), x_dir=(0, 0, 1), z_dir=(1, 0, 0))) as fillet3_2_piece_30:
        with BuildLine():
            CenterArc((FILLET3_R, -FILLET3_R), FILLET3_R, 90, 90)
            Line((0, -FILLET3_R), (0, 0))
            Line((0, 0), (FILLET3_R, 0))
        make_face()
    extrude(amount=327.181644985, mode=Mode.SUBTRACT)
    with BuildSketch(Plane(origin=(366.121494004, 3.430138118, -116.84), x_dir=(0, 0, 1), z_dir=(0.3140359740405954, 0.9494110843087806, 0))) as fillet3_2_piece_31:
        with BuildLine():
            CenterArc((FILLET3_R, -FILLET3_R), FILLET3_R, 90, 90)
            Line((0, -FILLET3_R), (0, 0))
            Line((0, 0), (FILLET3_R, 0))
        make_face()
    extrude(amount=144.503694539, mode=Mode.SUBTRACT)
    with BuildSketch(Plane(origin=(409.748367855, 143.874215983, -116.84), x_dir=(-0.25945651134605857, -0.9657547922325482, 5.594824691024398e-15), z_dir=(-0.9657547922325483, 0.25945651134605857, 0))) as fillet3_2_piece_32:
        with BuildLine():
            CenterArc((FILLET3_R, FILLET3_R), FILLET3_R, 180, 90)
            Line((0, FILLET3_R), (0, 0))
            Line((0, 0), (FILLET3_R, 0))
        make_face()
    extrude(amount=68.335470803, mode=Mode.SUBTRACT)

    # Sketch6 → Cut-Extrude3 (cut)
    with BuildSketch(Plane(origin=(-273.539082538, -76.932866964, 0), x_dir=(0, 0, 1), z_dir=(-0.9626509401538986, -0.27074557691828505, 0))):
        with Locations((0, 171.893465198)):
            Rectangle(SKETCH6_W, SKETCH6_H)
    extrude(amount=-CUT_EXTRUDE3_DEPTH, mode=Mode.SUBTRACT)

    # Fillet4
    fillet4_edges = [part.edges().sort_by_distance(p)[0] for p in [
        (-306.630244308, 92.322854624, -88.9),
        (-314.431986046, 120.062380804, 0),
        (-306.630244308, 92.322854624, 88.9),
        (-298.82850257, 64.583328445, 0),
        (-320.078477942, 88.540538915, -88.9),
        (-312.276736204, 60.801012735, 0),
        (-320.078477942, 88.540538915, 88.9),
        (-327.88021968, 116.280065095, 0),
    ]]
    fillet(fillet4_edges, radius=FILLET4_R)

    # Sketch8 → Boss-Extrude3 (add, two sides: drawn at the far end of the back side and taken through both)
    with BuildSketch(Plane.XY.offset(-BOSS_EXTRUDE3_DEPTH_BACK)):
        with Locations((-252.728784754, 75.375033192)):
            Circle(SKETCH8_R)
        with Locations((252.728784754, 75.375033192)):
            Circle(SKETCH8_R)
    extrude(amount=BOSS_EXTRUDE3_DEPTH + BOSS_EXTRUDE3_DEPTH_BACK)

    # Sketch9 → Cut-Extrude4 (cut)
    with BuildSketch(Plane(origin=(0, 0, -116.84), x_dir=(-1, 0, 0), z_dir=(0, 0, -1))):
        Polygon((165.217039659, 123.1520317), (95.341147185, 123.1520317), (-65.570239005, 123.1520317), (-65.570239005, 103.960765457), (165.217039659, 103.960765457), align=None)
    extrude(amount=-CUT_EXTRUDE4_DEPTH, mode=Mode.SUBTRACT)


solid = part.part
